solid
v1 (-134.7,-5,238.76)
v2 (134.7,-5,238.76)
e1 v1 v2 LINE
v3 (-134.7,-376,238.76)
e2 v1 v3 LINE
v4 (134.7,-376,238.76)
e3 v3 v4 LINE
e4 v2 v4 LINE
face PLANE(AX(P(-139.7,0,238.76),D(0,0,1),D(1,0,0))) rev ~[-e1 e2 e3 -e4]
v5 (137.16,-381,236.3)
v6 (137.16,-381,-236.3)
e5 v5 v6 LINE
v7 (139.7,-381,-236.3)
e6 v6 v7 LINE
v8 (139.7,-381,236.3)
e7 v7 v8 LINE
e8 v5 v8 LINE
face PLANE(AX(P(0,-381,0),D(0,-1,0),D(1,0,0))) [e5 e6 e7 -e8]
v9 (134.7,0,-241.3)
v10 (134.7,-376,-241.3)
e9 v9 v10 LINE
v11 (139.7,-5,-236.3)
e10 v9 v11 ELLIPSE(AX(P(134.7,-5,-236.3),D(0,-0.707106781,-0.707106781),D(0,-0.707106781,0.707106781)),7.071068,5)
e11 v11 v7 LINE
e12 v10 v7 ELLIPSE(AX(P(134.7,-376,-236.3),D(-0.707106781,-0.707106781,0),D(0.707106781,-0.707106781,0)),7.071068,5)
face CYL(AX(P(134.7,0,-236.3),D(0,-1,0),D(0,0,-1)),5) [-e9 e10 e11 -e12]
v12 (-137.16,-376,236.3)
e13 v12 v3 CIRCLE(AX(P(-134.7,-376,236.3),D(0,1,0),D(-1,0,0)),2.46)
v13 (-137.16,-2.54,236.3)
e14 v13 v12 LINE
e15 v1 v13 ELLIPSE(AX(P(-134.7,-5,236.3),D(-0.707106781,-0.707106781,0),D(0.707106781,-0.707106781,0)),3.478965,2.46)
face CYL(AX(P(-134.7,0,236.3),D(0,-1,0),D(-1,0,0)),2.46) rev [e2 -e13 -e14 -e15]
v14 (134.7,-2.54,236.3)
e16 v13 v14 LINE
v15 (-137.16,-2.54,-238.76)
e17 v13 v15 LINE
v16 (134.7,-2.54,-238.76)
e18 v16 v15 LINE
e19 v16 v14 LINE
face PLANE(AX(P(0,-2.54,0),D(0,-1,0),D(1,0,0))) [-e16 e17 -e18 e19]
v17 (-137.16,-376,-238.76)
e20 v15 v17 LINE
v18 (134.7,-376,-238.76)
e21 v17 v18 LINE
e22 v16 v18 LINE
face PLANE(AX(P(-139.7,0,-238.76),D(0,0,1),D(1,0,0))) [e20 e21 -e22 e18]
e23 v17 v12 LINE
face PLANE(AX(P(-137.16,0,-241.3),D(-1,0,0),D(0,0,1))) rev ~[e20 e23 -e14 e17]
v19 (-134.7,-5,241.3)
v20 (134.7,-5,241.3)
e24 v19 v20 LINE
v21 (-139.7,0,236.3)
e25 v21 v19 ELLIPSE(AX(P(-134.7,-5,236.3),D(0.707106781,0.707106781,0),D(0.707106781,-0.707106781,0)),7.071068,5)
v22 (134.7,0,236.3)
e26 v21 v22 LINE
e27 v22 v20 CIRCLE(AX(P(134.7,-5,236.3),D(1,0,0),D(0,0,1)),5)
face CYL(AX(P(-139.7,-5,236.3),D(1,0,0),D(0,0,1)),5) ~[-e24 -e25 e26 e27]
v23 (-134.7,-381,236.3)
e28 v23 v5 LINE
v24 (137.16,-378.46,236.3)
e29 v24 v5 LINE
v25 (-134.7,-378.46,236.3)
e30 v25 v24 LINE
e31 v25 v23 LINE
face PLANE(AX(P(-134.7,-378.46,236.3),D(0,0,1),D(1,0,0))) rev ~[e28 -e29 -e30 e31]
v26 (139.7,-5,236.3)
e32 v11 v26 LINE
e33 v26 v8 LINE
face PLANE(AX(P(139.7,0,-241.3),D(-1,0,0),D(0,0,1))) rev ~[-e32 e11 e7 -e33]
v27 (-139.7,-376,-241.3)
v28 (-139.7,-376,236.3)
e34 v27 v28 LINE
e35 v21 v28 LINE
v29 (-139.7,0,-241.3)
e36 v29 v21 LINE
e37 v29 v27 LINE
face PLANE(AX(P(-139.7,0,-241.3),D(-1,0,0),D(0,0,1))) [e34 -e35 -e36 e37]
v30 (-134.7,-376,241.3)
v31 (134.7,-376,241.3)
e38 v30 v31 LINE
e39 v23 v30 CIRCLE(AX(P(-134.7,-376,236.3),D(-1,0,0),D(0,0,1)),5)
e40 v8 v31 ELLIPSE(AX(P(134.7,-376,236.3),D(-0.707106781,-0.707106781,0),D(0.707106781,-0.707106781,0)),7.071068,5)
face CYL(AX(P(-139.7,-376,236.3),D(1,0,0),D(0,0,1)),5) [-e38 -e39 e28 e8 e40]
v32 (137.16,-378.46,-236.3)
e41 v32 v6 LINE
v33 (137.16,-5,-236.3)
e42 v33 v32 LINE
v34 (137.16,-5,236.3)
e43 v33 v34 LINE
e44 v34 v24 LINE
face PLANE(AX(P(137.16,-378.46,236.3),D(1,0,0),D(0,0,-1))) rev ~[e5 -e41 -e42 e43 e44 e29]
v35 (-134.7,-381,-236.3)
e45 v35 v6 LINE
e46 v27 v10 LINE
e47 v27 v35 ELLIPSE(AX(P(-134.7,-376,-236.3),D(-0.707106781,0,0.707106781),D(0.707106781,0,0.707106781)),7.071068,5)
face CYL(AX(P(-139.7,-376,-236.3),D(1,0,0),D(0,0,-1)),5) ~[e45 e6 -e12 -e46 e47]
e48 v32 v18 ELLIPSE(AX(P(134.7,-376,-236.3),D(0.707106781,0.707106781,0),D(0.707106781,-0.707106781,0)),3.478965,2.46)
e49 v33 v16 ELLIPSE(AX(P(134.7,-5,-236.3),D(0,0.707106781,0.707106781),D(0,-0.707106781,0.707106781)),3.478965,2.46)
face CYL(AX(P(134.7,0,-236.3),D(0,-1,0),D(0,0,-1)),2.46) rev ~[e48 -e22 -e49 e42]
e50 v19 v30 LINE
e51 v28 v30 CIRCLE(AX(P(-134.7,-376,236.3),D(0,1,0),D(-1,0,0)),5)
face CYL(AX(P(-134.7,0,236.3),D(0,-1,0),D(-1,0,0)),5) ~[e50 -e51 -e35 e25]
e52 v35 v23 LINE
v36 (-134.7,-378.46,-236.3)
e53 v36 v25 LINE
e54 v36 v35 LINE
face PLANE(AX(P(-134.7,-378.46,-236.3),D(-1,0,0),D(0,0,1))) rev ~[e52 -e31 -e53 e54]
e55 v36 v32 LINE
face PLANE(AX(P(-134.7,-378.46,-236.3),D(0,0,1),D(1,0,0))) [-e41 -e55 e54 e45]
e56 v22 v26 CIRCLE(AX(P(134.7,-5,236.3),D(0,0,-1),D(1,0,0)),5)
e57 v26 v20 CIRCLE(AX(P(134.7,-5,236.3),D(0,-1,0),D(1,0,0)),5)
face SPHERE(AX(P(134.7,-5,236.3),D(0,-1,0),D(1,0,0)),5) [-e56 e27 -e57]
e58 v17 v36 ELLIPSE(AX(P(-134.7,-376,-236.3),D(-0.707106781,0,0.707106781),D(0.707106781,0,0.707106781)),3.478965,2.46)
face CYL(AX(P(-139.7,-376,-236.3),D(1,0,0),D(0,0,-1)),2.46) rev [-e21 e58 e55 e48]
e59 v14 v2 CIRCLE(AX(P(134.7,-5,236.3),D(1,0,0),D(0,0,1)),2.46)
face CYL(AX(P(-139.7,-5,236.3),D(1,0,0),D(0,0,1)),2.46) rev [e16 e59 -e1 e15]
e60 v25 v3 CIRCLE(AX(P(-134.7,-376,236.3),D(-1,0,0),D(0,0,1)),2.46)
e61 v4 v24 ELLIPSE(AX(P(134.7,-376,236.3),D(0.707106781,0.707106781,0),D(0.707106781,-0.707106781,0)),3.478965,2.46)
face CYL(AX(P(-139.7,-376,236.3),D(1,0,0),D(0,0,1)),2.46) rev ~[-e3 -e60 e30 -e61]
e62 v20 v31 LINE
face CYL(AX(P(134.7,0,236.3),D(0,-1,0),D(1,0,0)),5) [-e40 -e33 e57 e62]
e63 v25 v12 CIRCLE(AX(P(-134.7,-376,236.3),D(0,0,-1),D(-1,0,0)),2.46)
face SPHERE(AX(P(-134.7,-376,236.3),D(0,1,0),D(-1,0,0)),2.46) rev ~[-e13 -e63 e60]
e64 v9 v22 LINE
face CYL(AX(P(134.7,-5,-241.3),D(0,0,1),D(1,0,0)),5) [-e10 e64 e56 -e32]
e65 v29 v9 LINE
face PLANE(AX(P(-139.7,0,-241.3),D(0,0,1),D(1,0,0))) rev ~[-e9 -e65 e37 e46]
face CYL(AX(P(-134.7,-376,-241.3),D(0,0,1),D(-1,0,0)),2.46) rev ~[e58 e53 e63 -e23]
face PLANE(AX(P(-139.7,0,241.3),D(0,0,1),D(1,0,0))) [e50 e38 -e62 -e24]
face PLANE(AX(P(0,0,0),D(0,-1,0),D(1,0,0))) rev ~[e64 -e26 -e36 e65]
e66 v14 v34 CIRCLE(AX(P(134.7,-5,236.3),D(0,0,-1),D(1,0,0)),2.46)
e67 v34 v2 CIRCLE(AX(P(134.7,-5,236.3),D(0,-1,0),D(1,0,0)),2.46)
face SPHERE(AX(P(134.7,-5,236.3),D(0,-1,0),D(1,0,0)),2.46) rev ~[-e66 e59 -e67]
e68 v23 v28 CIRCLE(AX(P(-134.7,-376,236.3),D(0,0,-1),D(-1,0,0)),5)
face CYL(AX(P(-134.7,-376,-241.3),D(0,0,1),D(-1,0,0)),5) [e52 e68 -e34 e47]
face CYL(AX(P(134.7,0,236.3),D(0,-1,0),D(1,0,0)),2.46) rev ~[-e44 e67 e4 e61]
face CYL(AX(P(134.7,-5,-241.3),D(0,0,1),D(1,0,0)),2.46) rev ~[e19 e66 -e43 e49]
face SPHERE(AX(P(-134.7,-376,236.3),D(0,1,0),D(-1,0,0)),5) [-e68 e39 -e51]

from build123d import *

# Parameters (mm, degrees)
F0_W     = 279.4
F0_H     = 482.6
F1_DEPTH = 381
F2_R     = 5
F3_T     = -2.54


# Not quite as in the source:
# - a shell that OpenCascade refuses in one call is made with other operations: the cavity is built on its own and cut out


with BuildPart() as f1:
    # F0 (on Front) → F1 (new body)
    with BuildSketch(Plane.XZ):
        Rectangle(F0_W, F0_H)
    extrude(amount=F1_DEPTH)

    # F2
    f2_edges = [f1.edges().sort_by_distance(p)[0] for p in [
        (139.7, -190.5, 241.3),
        (-139.7, -190.5, 241.3),
        (139.7, -190.5, -241.3),
        (139.7, 0, 0),
        (0, 0, 241.3),
        (-139.7, -381, 0),
        (0, -381, -241.3),
        (0, -381, 241.3),
    ]]
    fillet(f2_edges, radius=F2_R)

    # F3: a shell. OpenCascade refuses it in one call, so the cavity is built on its own and cut out:
    # the body offset inwards by the wall thickness, plus a prism from it out through each open face.
    f3_core = offset(f1.part, amount=F3_T, mode=Mode.PRIVATE)
    f3_exits = [f3_core.faces().sort_by_distance(p)[0] for p in [
        (1.23, -378.46, 0),
    ]]
    add(f3_core, mode=Mode.SUBTRACT)
    extrude(f3_exits, amount=-F3_T, mode=Mode.SUBTRACT)


solid = f1.part
